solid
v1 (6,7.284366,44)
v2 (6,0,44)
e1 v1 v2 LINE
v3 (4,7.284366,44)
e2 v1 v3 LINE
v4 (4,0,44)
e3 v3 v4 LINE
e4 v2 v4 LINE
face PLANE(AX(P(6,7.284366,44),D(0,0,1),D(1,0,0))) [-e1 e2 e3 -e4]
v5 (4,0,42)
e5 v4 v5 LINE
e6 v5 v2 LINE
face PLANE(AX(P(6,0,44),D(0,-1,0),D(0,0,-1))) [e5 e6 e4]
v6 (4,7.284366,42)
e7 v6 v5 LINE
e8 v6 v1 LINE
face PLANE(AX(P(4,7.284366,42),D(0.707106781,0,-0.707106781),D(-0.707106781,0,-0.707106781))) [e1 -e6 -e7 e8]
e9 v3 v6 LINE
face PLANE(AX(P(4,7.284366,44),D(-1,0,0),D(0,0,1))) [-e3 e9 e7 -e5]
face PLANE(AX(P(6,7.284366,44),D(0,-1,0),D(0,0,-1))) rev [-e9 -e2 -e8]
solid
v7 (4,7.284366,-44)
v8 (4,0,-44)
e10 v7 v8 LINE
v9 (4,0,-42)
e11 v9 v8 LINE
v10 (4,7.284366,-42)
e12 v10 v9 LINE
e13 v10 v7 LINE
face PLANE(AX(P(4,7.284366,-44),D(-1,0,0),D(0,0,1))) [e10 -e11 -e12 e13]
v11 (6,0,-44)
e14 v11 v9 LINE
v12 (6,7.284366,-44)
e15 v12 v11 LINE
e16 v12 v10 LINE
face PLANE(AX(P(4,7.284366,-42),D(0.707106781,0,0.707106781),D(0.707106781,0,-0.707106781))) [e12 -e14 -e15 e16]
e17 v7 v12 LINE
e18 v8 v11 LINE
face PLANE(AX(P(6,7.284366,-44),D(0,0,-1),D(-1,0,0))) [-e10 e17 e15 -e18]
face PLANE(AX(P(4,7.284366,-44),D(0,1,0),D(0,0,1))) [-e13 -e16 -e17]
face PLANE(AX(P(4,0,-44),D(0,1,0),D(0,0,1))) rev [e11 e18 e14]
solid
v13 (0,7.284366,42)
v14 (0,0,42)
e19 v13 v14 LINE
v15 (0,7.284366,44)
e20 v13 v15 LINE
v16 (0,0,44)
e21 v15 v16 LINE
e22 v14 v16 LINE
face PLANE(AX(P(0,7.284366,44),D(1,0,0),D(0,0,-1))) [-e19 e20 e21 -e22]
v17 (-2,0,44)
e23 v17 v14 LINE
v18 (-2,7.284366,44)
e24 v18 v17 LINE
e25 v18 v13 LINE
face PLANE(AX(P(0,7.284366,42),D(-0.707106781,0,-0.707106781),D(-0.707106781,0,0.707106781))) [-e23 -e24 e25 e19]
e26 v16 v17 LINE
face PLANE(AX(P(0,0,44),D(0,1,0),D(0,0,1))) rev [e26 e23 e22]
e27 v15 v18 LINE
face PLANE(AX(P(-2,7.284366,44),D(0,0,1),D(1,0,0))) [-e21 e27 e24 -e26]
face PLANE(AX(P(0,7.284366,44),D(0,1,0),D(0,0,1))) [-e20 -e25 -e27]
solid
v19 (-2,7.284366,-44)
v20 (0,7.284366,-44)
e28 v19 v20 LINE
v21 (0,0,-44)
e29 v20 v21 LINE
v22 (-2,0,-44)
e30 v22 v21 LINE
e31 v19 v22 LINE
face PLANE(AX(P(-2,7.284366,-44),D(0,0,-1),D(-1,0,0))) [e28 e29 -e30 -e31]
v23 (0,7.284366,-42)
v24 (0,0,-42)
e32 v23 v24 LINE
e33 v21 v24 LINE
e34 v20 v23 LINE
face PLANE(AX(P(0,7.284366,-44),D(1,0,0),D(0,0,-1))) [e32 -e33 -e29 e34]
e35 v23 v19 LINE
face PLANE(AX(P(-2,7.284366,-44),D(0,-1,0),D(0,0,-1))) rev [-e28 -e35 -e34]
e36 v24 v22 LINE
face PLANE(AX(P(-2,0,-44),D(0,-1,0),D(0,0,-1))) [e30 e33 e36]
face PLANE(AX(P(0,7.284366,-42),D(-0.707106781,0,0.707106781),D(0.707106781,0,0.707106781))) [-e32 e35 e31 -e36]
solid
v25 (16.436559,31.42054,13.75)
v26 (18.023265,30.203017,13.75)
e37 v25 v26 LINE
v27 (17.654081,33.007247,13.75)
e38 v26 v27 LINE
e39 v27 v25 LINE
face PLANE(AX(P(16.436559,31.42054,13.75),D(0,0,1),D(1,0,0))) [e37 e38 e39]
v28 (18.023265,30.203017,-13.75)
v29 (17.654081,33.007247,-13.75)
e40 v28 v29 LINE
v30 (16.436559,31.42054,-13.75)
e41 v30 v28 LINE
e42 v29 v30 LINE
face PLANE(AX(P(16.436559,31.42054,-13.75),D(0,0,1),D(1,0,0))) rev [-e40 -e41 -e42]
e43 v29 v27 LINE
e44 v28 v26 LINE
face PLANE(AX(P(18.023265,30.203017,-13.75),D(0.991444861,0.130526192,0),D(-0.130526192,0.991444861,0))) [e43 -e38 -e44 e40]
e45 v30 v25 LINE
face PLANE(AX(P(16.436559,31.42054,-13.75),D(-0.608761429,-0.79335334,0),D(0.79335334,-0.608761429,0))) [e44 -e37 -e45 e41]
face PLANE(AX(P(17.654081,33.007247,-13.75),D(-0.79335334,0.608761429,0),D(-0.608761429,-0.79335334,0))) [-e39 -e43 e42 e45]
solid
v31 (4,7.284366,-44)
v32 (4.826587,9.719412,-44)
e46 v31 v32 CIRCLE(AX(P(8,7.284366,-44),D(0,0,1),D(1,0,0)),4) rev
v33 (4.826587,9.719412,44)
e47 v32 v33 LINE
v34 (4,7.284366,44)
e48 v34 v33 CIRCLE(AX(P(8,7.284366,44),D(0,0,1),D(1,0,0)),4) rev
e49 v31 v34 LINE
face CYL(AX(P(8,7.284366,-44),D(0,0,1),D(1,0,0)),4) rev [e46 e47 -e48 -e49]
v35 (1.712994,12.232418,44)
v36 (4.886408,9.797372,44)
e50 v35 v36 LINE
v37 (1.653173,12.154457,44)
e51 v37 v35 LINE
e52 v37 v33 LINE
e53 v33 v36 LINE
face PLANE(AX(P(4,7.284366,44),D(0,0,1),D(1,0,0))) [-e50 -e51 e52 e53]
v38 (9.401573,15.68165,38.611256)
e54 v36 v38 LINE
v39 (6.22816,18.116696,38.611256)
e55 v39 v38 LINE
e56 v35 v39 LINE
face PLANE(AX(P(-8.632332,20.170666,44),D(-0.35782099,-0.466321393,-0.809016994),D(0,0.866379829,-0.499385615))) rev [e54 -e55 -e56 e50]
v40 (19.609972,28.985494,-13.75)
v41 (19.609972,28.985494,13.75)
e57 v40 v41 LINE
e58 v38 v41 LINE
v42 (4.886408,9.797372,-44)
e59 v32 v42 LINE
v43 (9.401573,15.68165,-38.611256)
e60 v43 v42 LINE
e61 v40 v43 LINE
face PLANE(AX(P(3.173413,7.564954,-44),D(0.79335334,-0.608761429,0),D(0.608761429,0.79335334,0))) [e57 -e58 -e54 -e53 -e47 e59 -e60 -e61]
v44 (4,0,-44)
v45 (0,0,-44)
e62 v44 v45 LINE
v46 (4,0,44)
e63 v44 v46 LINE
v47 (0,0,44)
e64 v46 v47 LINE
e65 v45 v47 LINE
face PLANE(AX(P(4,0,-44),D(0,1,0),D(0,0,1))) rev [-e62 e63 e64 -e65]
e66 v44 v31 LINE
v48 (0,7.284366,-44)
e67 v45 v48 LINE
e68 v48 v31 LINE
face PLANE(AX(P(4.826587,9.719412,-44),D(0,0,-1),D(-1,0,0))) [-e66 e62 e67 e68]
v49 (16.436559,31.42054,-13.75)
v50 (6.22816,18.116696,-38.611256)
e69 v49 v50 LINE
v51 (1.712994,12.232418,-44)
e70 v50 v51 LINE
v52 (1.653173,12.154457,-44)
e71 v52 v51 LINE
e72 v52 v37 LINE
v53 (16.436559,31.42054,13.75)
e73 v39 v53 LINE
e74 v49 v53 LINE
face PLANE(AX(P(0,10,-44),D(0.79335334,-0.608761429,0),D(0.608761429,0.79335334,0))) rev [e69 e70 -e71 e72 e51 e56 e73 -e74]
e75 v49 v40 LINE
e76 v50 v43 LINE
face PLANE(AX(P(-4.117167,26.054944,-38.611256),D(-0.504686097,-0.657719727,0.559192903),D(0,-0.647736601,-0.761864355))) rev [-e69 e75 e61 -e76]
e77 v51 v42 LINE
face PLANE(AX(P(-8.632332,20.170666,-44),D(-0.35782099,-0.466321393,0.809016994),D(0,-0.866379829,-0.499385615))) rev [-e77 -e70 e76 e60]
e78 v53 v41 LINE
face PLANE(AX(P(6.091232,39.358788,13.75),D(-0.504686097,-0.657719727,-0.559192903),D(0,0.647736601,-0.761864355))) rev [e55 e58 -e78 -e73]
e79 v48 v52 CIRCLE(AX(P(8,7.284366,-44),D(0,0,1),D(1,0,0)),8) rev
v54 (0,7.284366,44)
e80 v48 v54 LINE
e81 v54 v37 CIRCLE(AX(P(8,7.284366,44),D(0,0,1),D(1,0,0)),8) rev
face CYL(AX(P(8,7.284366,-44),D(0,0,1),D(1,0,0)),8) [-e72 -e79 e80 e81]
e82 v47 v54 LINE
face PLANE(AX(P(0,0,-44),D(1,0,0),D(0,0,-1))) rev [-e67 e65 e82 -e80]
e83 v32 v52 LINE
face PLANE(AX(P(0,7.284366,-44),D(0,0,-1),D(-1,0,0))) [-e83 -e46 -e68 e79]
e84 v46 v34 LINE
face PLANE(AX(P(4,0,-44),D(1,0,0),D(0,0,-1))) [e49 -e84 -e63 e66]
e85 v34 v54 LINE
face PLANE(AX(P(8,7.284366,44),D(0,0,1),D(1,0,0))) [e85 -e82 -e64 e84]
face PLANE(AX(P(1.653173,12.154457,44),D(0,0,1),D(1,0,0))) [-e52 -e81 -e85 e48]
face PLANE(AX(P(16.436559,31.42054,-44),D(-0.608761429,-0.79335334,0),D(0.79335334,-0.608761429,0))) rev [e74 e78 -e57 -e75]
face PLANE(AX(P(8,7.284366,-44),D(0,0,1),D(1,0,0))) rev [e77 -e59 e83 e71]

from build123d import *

# Parameters (mm, degrees)
SM_BASE_FLANGE_1_DEPTH = 44
CUT_EXTRUDE_1_DEPTH    = 58.421720735
EXTRUDE_START          = 13.75
EXTRUDE_2_DEPTH        = 27.5
EXTRUDE_3_DEPTH        = 7.284366
EXTRUDE_3_2_DEPTH      = 7.284366
EXTRUDE_3_3_DEPTH      = 7.284366
EXTRUDE_3_4_DEPTH      = 7.284366


# Sheet-metal steps are written as plain solids
with BuildPart() as part:
    # Sketch 1 → Базовая кромка1 (new, symmetric)
    with BuildSketch(Plane.XY):
        with BuildLine():
            Line((0, 0), (0, 7.284365929))
            ThreePointArc((0, 7.284365929), (0.424558964, 9.855881652), (1.653173278, 12.154457361))
            Line((1.653173278, 12.154457361), (16.436558583, 31.420540188))
            Line((16.436558583, 31.420540188), (19.609971944, 28.985494472))
            Line((19.609971944, 28.985494472), (4.826586639, 9.719411645))
            ThreePointArc((4.826586639, 9.719411645), (4.212279482, 8.57012379), (4, 7.284365929))
            Line((4, 7.284365929), (4, 0))
            Line((4, 0), (0, 0))
        make_face()
    extrude(amount=SM_BASE_FLANGE_1_DEPTH, both=True)

    # Эскиз3 → Вытянуть1 (cut, through all)
    with BuildSketch(Plane(origin=(-1.65621577, 1.270859058, 0), x_dir=(0, 0, -1), z_dir=(0.7933533402912344, -0.6087614290087218, 0))):
        Polygon((-44, 10.74743452), (-44, 34.933533403), (-13.75, 34.933533403), (-38.611255778, 18.164404641), align=None)
        Polygon((44, 34.933533403), (13.75, 34.933533403), (38.611255778, 18.164404641), (44, 10.74743452), align=None)
    extrude(amount=-CUT_EXTRUDE_1_DEPTH, mode=Mode.SUBTRACT)


with BuildPart() as body_2:
    # Эскиз4 → Вытянуть2 (new body)
    with BuildSketch(Plane.XY.offset(EXTRUDE_START)):
        Polygon((16.436558583, 31.420540188), (18.023265264, 30.20301733), (17.654081441, 33.007246868), align=None)
    extrude(amount=-EXTRUDE_2_DEPTH)


with BuildPart() as body_3:
    # Эскиз5 → Вытянуть3 (new body)
    with BuildSketch(Plane.XZ):
        Polygon((0, 44), (0, 42), (-2, 44), align=None)
    extrude(amount=-EXTRUDE_3_DEPTH)


with BuildPart() as body_4:
    # Эскиз5 → Extrude 3 2 (new body)
    with BuildSketch(Plane.XZ):
        Polygon((6, 44), (4, 44), (4, 42), align=None)
    extrude(amount=-EXTRUDE_3_2_DEPTH)


with BuildPart() as body_5:
    # Эскиз5 → Extrude 3 3 (new body)
    with BuildSketch(Plane.XZ):
        Polygon((4, -44), (4, -42), (6, -44), align=None)
    extrude(amount=-EXTRUDE_3_3_DEPTH)


with BuildPart() as body_6:
    # Эскиз5 → Extrude 3 4 (new body)
    with BuildSketch(Plane.XZ):
        Polygon((-2, -44), (0, -44), (0, -42), align=None)
    extrude(amount=-EXTRUDE_3_4_DEPTH)


solid = Compound([part.part, body_2.part, body_3.part, body_4.part, body_5.part, body_6.part])
